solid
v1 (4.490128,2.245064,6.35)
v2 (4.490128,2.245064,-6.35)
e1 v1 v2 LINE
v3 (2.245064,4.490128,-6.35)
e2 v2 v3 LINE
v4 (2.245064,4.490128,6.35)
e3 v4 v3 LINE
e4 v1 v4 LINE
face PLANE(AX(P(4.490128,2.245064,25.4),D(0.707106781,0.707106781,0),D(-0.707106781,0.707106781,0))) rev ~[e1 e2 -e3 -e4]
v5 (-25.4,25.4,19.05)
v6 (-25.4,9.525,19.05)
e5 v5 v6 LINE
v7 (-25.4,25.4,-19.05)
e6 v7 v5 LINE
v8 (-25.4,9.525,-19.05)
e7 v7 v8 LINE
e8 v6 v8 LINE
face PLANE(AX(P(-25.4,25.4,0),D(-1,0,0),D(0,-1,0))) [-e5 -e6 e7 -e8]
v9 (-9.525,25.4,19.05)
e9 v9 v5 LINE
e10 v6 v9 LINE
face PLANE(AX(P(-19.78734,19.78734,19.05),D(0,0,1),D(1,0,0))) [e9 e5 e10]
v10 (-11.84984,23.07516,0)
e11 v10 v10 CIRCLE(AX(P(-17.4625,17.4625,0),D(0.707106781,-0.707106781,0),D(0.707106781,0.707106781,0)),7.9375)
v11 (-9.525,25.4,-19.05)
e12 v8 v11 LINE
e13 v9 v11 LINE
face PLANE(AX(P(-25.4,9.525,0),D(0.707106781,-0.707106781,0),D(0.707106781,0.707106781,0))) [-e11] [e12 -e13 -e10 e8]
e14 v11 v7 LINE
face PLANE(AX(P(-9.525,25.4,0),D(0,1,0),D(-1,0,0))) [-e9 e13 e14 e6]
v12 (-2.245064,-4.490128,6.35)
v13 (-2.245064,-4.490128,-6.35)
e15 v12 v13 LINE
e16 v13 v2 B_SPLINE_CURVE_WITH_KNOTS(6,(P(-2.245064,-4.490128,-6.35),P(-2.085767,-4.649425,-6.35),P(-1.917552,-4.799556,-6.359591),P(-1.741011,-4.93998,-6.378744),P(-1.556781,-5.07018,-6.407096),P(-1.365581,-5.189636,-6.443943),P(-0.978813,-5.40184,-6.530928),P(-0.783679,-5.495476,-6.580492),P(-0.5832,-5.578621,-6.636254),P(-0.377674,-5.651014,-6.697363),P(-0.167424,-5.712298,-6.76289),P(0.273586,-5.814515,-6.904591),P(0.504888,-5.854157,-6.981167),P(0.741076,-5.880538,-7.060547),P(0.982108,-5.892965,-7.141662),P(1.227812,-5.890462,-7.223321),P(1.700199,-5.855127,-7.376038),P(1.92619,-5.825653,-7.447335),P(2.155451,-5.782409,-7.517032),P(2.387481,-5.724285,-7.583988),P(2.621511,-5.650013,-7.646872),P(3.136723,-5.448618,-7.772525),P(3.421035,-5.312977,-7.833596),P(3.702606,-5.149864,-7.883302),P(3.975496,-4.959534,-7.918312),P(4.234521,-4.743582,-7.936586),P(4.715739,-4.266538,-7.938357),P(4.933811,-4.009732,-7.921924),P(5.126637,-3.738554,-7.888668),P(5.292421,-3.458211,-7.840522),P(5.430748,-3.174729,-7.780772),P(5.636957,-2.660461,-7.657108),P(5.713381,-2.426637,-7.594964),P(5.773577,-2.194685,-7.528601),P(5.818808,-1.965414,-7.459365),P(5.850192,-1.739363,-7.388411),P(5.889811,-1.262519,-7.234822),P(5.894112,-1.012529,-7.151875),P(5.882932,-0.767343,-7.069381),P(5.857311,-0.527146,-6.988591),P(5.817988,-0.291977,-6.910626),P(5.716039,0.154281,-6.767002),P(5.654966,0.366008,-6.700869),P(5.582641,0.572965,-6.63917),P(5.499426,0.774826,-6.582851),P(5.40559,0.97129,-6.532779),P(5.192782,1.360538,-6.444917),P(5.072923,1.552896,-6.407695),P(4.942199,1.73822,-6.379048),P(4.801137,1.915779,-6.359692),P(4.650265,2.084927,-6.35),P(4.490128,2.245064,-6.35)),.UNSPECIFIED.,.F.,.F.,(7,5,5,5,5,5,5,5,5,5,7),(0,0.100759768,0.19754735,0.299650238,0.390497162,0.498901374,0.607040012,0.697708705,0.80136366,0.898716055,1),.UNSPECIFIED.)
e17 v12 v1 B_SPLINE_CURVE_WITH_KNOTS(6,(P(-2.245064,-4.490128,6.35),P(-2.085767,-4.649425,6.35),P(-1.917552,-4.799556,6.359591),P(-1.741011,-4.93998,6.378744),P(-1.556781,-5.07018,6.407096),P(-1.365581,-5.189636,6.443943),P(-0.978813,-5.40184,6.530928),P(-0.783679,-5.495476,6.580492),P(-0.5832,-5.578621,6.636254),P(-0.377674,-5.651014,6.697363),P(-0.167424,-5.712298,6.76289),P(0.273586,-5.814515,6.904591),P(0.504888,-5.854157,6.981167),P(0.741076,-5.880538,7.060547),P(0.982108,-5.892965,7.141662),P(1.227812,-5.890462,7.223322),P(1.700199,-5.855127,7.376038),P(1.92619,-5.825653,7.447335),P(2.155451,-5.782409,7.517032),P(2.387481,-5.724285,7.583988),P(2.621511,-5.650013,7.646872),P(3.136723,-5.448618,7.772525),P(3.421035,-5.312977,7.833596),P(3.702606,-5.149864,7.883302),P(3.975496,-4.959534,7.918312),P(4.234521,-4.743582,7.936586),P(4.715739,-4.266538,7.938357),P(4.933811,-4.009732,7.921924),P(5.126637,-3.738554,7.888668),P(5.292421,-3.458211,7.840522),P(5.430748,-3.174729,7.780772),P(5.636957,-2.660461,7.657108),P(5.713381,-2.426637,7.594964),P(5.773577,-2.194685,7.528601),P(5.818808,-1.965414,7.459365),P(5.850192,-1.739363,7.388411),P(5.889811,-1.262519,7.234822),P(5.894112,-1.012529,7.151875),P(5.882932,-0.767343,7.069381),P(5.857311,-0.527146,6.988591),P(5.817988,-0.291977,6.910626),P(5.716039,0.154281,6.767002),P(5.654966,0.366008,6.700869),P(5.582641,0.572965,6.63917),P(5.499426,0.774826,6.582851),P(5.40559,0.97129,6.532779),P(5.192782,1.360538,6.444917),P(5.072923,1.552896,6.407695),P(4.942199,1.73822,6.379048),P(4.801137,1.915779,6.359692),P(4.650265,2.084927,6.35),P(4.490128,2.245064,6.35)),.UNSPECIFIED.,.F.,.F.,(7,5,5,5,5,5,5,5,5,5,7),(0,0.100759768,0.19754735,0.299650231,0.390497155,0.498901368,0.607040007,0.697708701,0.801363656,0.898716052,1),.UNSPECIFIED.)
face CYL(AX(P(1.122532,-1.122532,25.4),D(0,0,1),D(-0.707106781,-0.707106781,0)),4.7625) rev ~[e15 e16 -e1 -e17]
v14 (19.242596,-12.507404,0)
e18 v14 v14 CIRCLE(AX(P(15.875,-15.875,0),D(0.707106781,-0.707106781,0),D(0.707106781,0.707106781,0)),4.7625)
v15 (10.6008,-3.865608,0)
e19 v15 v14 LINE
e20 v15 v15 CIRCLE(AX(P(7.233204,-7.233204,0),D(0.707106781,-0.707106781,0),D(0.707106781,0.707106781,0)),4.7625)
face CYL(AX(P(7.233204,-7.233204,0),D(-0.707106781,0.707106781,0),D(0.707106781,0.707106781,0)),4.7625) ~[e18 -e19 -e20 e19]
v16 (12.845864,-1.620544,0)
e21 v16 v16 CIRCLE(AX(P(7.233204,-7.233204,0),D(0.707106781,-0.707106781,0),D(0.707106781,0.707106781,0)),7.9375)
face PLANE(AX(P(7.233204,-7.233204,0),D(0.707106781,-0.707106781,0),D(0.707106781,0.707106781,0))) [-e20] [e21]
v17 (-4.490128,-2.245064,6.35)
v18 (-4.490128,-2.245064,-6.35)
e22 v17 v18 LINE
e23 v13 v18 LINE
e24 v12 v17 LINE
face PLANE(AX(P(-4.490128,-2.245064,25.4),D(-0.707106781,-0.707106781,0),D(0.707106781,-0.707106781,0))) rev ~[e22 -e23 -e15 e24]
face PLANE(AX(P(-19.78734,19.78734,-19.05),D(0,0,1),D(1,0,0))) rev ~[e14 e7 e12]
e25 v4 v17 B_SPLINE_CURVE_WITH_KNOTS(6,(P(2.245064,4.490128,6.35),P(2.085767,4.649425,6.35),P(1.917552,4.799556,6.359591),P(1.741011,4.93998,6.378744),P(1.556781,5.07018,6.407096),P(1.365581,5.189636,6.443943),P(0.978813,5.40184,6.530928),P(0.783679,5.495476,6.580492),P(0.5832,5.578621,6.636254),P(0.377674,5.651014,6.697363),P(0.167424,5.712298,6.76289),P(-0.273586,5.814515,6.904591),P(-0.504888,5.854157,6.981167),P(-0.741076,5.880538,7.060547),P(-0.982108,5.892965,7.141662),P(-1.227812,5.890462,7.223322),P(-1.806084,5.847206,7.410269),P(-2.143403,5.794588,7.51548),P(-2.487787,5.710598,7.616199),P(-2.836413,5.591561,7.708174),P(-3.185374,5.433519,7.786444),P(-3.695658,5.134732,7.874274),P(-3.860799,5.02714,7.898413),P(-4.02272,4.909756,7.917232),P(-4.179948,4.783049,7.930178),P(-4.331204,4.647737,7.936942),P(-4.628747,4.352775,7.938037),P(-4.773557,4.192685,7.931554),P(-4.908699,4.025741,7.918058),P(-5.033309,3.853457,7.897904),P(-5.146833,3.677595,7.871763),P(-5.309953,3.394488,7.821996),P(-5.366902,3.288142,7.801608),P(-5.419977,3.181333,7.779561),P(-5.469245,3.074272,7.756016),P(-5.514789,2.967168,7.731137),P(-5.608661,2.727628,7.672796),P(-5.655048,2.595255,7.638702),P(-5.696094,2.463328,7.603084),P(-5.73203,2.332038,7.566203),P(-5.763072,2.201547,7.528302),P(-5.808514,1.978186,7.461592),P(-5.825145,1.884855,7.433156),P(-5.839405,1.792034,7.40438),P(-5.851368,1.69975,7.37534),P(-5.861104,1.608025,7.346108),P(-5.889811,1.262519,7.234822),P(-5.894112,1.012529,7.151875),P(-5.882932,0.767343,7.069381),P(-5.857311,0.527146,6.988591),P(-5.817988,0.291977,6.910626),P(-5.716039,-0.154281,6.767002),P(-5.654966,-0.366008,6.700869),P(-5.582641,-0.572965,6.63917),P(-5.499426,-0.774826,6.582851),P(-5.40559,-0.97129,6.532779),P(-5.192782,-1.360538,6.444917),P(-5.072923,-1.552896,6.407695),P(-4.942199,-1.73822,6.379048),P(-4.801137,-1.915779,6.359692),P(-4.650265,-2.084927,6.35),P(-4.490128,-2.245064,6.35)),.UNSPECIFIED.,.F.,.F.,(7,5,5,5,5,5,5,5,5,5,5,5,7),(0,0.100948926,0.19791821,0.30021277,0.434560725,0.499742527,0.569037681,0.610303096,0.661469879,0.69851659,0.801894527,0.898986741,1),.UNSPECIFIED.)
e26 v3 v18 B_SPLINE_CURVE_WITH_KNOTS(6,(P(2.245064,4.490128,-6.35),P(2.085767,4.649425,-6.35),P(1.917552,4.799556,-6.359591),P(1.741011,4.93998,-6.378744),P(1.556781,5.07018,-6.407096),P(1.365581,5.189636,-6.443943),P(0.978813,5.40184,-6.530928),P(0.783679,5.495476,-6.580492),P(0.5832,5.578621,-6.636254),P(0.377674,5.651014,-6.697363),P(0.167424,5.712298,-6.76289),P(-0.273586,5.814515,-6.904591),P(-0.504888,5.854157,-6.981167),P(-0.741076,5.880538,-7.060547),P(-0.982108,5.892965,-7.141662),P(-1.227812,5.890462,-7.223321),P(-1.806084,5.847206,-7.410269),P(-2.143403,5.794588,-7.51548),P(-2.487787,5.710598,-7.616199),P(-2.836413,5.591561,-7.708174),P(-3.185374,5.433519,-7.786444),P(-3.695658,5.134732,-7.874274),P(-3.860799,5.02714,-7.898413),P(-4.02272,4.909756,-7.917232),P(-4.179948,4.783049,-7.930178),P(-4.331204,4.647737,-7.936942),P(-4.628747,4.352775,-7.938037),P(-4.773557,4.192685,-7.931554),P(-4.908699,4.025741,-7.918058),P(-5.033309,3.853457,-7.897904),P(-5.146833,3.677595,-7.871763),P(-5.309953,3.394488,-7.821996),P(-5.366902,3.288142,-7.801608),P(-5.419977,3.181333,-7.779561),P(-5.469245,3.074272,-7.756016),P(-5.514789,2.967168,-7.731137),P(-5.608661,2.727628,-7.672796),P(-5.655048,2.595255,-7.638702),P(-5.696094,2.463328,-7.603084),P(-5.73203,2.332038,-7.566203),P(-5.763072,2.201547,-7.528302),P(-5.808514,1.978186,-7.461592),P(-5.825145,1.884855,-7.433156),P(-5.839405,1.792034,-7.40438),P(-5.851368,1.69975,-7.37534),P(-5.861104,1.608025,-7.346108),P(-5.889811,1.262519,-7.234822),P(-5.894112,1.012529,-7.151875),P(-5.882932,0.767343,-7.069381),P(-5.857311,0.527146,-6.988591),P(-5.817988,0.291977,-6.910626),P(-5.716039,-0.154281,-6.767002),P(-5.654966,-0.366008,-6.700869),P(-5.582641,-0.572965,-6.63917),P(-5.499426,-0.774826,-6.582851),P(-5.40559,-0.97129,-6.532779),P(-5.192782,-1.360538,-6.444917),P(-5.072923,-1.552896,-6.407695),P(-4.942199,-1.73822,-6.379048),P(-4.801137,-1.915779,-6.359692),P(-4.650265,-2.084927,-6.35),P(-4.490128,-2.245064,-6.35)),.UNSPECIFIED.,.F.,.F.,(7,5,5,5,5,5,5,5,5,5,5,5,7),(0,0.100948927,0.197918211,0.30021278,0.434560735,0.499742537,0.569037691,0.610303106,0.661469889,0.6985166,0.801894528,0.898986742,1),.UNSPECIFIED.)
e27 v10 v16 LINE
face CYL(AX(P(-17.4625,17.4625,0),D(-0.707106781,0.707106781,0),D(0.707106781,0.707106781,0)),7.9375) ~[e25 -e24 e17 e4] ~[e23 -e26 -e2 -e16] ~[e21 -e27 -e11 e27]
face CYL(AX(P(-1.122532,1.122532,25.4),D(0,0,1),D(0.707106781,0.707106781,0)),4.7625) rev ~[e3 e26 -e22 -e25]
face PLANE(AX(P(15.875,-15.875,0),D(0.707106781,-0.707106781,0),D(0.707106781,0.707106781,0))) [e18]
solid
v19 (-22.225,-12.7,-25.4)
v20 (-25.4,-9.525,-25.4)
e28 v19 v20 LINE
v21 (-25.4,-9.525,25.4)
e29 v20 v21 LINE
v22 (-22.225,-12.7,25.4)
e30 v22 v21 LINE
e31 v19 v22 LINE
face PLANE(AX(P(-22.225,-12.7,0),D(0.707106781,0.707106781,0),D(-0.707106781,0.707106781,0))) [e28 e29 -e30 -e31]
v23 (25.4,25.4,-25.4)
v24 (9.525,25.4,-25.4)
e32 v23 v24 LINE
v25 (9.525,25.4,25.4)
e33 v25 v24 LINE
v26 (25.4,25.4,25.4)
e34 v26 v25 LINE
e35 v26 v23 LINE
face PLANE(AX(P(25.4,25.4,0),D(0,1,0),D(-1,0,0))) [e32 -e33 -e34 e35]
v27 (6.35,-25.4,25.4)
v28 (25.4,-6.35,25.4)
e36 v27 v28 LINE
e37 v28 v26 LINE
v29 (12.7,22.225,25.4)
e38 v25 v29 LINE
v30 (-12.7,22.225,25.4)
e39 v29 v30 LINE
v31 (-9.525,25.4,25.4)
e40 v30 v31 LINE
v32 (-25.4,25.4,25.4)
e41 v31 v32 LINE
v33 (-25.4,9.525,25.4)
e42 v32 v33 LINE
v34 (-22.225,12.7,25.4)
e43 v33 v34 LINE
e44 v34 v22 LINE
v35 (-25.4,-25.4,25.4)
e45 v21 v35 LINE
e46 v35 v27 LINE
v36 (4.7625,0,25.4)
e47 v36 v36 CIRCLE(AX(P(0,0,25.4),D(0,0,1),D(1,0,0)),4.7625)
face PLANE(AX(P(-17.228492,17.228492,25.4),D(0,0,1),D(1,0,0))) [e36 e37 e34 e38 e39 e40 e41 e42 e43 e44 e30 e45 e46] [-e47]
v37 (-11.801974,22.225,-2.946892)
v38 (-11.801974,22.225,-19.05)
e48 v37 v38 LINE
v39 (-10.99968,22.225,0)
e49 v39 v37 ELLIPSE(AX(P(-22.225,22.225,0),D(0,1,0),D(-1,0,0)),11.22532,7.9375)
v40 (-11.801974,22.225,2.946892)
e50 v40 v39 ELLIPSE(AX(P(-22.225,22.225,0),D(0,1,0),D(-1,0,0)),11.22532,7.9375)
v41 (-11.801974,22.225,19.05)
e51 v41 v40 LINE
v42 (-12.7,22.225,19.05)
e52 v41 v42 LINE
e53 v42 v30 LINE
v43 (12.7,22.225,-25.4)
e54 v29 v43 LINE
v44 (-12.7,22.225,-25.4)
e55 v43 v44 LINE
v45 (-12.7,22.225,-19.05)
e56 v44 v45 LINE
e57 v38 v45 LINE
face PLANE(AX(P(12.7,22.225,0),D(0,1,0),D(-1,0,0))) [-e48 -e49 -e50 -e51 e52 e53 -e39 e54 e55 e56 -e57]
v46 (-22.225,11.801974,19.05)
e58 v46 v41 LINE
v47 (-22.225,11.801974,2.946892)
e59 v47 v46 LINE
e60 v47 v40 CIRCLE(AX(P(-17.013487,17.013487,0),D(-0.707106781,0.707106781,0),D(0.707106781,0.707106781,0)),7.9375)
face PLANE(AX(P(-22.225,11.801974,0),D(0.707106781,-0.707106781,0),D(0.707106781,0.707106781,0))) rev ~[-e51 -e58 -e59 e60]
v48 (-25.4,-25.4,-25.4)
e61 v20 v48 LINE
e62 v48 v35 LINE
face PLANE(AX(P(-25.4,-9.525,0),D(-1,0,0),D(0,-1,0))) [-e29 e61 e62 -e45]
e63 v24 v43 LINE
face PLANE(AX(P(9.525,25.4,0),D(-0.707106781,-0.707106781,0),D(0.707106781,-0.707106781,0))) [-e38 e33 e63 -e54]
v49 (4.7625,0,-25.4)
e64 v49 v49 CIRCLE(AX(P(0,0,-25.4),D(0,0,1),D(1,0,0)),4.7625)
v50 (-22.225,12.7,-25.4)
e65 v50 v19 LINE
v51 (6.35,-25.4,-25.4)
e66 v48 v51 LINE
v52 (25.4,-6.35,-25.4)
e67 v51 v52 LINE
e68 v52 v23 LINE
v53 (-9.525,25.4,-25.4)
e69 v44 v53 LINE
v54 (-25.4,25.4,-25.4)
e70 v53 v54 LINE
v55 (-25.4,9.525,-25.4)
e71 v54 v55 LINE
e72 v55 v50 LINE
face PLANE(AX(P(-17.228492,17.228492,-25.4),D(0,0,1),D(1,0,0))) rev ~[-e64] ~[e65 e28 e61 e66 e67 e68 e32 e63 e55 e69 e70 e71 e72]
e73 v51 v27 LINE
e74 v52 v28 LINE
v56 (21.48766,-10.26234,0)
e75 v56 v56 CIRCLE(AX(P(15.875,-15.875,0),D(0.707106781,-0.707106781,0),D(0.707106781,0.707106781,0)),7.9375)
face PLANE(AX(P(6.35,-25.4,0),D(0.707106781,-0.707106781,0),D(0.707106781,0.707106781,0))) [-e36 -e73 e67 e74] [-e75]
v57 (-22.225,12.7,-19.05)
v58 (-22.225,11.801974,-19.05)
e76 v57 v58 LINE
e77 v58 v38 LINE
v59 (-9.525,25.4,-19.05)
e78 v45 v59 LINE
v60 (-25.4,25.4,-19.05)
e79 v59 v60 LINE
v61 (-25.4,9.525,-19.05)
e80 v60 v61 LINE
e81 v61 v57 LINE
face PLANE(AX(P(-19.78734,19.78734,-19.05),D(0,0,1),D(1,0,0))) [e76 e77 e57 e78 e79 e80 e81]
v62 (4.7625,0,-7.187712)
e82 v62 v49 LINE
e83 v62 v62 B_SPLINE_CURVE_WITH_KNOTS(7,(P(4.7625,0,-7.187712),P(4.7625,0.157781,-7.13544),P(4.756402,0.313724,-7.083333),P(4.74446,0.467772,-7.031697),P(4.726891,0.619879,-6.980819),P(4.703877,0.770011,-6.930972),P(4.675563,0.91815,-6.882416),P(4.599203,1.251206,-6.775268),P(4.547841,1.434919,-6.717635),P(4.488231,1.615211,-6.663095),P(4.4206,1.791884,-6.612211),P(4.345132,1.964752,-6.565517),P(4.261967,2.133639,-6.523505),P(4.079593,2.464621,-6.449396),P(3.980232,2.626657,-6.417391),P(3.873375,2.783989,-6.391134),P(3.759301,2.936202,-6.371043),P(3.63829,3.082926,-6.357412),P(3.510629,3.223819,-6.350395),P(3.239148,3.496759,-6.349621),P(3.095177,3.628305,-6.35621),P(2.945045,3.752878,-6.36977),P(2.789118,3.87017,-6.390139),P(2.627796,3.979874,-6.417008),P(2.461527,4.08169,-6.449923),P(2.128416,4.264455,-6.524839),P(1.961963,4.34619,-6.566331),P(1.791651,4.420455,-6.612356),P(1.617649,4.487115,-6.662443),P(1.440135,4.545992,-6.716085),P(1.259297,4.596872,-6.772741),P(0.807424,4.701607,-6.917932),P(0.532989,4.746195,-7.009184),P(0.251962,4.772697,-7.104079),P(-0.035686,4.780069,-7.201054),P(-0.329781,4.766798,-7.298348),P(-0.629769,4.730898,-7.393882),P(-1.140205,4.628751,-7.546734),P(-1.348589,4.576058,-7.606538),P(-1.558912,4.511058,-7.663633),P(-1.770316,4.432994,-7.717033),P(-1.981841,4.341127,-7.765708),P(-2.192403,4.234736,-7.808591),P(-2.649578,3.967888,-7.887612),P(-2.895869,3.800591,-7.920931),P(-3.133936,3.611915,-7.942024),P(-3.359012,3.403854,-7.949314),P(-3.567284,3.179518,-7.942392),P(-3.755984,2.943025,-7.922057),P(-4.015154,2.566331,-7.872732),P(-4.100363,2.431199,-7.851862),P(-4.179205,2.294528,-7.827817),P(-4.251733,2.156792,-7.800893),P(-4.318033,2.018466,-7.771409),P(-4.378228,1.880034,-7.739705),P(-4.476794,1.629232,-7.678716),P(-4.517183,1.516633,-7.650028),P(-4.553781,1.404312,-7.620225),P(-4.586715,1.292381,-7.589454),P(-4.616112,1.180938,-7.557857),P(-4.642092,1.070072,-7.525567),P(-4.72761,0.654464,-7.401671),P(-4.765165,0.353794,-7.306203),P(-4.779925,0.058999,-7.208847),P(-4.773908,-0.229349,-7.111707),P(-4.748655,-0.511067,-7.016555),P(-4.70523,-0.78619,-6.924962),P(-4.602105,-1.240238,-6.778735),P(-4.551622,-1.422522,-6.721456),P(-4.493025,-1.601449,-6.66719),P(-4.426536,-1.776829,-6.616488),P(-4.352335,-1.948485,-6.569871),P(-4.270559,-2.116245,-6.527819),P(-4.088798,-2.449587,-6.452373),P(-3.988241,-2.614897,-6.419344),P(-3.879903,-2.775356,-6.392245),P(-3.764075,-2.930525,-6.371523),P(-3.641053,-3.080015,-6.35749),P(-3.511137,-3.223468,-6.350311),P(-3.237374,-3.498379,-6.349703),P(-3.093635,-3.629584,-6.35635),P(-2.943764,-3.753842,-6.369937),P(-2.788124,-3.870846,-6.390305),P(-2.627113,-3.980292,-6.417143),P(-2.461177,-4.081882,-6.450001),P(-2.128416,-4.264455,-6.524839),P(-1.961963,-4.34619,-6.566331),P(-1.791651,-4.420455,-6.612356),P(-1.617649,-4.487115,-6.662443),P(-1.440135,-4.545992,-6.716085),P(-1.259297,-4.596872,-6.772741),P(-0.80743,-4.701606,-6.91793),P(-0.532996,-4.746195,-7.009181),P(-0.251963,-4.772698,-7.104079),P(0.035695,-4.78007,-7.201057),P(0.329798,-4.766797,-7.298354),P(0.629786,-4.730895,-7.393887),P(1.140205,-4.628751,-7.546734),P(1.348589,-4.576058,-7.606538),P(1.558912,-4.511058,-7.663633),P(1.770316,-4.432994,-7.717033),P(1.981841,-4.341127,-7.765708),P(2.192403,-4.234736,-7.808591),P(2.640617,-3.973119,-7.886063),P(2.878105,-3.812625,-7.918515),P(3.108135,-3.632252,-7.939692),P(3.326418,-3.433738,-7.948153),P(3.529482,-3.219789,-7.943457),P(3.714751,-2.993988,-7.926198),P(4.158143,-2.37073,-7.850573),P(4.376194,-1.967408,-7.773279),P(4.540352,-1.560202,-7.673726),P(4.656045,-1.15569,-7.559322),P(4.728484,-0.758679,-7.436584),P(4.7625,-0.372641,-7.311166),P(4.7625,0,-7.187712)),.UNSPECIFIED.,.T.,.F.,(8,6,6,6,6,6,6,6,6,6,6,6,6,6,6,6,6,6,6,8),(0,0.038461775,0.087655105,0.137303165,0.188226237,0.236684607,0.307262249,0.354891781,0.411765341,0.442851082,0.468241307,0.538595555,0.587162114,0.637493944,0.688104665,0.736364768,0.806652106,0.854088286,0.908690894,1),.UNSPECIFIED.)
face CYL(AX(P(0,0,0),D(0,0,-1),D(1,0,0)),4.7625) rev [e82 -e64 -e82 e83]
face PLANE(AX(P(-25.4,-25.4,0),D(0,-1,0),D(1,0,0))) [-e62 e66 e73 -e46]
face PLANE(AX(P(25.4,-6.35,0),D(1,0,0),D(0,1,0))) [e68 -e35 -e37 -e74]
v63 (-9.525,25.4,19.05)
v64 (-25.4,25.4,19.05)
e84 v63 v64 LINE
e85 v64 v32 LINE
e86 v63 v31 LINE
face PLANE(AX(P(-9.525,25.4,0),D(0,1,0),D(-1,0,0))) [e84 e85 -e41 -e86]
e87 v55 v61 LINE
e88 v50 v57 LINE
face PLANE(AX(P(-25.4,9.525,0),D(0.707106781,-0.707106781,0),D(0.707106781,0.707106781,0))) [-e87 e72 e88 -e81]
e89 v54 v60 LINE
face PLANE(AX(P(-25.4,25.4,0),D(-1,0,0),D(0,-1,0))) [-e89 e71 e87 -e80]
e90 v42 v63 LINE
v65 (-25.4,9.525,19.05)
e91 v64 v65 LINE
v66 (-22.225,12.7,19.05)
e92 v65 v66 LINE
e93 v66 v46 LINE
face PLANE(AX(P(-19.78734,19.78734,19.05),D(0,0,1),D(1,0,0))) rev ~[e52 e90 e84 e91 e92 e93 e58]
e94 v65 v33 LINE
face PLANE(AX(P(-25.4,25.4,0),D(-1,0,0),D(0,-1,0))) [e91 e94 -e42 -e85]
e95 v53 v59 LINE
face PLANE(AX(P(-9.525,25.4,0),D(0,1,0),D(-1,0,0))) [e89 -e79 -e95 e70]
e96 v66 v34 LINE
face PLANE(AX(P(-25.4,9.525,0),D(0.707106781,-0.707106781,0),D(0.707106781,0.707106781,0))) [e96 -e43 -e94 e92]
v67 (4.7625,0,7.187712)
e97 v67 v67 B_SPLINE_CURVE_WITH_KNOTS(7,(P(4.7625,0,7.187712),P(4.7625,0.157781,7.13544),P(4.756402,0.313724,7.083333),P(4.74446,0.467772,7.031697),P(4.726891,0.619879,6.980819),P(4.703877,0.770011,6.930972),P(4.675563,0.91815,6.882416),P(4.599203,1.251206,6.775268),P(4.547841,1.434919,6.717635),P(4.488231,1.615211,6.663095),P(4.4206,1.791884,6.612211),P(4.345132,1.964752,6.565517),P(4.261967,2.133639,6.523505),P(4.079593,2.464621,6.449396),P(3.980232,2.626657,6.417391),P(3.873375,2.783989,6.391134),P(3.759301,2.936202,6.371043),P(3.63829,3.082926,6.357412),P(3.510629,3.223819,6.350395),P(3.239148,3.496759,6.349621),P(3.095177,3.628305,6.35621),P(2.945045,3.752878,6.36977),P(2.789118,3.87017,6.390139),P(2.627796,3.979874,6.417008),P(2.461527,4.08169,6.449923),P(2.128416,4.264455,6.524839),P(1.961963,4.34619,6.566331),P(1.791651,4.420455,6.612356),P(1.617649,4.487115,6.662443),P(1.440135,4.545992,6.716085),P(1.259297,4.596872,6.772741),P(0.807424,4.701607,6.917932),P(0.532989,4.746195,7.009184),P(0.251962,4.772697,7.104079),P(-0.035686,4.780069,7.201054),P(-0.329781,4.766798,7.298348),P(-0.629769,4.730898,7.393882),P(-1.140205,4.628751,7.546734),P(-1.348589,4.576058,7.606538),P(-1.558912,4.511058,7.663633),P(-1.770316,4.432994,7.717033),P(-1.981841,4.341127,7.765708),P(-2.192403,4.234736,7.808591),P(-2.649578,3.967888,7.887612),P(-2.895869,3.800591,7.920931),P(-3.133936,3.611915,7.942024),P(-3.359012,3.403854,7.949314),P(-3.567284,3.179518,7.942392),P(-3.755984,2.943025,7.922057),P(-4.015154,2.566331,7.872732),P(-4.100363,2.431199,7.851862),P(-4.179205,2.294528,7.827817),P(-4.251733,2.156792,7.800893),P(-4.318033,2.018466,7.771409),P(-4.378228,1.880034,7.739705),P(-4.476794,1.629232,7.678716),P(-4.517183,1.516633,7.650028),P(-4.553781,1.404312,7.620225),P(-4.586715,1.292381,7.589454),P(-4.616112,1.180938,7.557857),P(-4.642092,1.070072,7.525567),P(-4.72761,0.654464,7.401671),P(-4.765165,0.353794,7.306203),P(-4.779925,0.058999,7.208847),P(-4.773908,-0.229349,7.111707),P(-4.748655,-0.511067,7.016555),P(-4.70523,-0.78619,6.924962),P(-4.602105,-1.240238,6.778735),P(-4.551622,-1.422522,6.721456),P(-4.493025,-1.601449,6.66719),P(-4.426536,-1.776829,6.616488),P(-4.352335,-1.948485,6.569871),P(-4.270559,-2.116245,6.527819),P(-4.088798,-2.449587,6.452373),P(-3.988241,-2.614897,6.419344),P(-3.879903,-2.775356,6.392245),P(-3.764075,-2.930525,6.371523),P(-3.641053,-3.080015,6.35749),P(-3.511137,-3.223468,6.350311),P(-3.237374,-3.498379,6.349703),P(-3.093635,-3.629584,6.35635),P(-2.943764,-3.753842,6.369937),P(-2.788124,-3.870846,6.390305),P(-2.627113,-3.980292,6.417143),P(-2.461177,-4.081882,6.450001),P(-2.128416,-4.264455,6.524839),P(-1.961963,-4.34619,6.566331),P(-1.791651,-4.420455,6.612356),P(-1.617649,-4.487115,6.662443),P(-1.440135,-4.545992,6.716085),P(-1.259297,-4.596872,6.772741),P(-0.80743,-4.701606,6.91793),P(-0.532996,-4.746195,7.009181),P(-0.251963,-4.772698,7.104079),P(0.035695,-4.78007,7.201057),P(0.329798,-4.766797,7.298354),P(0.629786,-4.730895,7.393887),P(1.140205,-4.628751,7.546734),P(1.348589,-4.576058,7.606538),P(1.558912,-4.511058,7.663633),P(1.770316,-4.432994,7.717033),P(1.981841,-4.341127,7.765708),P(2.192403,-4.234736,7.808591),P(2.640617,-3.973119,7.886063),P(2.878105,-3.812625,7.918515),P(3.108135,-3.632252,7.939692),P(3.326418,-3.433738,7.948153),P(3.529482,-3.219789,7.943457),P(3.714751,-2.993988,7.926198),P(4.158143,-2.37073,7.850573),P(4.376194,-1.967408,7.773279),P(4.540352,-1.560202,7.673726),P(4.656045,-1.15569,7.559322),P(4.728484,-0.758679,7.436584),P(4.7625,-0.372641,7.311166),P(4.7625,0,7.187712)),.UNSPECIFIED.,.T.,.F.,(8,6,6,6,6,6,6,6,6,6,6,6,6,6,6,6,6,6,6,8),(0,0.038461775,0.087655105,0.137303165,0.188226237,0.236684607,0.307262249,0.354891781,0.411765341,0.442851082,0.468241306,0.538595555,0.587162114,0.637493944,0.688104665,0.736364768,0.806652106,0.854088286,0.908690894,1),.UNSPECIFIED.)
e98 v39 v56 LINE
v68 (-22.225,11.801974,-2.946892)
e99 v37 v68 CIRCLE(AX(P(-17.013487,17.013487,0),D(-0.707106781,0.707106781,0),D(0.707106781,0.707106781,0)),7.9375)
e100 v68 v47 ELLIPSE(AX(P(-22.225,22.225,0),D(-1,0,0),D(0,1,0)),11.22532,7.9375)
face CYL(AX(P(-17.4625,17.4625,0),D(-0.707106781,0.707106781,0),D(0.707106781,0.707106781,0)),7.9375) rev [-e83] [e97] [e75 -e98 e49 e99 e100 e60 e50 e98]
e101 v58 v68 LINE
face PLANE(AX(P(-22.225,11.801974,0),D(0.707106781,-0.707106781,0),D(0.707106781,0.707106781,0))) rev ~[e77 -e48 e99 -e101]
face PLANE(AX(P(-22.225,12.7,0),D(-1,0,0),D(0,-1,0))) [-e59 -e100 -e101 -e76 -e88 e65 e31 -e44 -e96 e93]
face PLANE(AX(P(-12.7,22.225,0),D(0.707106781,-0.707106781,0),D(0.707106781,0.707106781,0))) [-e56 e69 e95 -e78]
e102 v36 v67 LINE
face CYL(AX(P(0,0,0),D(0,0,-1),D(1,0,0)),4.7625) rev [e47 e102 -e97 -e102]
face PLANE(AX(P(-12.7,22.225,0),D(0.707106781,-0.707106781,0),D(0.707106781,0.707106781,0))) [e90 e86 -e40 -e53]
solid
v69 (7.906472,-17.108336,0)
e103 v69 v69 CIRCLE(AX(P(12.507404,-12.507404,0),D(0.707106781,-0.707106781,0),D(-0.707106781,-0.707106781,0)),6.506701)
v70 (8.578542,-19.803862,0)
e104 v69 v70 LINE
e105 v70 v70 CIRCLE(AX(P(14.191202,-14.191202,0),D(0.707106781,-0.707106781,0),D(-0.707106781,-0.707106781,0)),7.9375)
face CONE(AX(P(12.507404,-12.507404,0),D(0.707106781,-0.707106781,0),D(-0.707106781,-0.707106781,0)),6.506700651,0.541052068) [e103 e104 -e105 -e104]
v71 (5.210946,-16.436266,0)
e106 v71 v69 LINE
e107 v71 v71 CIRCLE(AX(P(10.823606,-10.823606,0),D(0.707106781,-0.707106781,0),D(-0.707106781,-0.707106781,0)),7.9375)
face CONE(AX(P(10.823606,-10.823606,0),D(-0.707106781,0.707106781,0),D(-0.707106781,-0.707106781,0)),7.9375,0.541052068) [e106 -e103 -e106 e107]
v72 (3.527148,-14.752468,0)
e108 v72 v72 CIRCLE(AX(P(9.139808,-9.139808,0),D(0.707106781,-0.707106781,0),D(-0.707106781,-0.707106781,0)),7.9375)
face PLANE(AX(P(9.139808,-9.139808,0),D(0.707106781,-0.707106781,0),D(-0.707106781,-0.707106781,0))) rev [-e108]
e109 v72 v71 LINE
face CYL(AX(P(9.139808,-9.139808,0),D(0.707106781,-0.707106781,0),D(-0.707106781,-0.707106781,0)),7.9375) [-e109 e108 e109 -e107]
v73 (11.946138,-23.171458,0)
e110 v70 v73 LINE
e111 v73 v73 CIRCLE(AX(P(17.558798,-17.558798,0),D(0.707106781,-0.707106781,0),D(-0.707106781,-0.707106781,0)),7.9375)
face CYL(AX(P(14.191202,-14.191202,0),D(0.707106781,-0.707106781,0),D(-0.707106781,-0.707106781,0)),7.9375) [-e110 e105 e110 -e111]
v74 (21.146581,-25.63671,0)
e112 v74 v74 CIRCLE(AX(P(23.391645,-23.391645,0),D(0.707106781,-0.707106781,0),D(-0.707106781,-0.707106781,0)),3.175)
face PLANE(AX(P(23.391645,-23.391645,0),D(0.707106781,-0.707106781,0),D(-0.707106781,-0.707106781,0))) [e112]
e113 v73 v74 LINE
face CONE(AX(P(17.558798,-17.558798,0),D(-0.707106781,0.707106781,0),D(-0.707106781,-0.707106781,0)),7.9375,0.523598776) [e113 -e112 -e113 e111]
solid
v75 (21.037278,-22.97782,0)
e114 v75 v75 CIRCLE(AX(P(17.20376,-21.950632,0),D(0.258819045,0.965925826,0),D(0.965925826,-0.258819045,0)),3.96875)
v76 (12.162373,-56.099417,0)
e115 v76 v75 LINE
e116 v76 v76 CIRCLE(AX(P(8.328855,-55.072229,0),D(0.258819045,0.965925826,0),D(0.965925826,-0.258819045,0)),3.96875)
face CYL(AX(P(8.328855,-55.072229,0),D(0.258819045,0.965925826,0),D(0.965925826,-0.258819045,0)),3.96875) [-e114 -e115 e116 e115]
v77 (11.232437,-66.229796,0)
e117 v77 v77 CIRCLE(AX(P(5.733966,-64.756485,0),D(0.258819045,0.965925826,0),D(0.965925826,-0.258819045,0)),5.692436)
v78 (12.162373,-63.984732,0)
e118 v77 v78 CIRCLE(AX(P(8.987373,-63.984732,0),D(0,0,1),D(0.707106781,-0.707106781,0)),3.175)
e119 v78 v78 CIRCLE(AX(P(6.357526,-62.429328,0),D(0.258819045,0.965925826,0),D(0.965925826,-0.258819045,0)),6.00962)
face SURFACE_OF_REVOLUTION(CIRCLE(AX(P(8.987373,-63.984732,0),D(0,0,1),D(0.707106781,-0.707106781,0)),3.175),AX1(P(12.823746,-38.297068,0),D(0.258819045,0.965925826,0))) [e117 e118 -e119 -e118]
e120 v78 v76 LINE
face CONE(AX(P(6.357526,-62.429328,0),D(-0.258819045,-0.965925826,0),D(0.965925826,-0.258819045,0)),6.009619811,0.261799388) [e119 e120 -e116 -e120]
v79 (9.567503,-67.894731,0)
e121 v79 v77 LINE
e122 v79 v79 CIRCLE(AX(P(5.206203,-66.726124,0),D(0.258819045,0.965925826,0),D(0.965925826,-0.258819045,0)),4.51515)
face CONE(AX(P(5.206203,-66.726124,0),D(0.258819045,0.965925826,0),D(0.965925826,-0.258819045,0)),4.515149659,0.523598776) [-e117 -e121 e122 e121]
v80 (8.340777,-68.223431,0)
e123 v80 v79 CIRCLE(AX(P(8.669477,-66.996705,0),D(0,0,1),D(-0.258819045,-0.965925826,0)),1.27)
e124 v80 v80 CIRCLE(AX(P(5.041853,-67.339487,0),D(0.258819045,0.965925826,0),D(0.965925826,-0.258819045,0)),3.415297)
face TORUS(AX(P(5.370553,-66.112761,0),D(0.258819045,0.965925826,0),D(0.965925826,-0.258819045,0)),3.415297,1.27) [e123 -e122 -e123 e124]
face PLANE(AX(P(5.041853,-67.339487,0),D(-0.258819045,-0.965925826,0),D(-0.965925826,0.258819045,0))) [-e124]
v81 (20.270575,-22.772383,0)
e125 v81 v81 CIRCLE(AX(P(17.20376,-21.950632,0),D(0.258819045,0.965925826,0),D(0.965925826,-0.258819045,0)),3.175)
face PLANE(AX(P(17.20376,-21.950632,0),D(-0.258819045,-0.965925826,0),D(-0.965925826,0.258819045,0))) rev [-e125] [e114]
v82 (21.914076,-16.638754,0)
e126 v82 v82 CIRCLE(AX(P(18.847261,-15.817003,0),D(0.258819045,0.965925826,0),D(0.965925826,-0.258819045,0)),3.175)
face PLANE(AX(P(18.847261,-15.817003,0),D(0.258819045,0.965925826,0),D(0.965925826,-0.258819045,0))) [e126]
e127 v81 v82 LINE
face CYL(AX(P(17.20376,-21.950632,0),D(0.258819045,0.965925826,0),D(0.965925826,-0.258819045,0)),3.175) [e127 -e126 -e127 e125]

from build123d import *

# Parameters (mm, degrees)
F1_R      = 4.7625
F2_DEPTH  = 25.4
F3_DEPTH  = 19.05
F4_DEPTH  = 19.05
F5_R      = 7.9375
F6_DEPTH  = 47.1463446356
F7_DEPTH  = 34.925
F8_R      = 4.7625
F9_DEPTH  = 12.2213446356
F11_DEPTH = 50.8010001


with BuildPart() as f2:
    # F1 (on Top) → F2 (new body, symmetric)
    with BuildSketch(Plane.XY):
        Polygon((-11.8019743879, 22.225), (-12.7, 22.225), (-22.225, 12.7), (-22.225, 11.8019743879), align=None)
        Polygon((25.4, -6.35), (25.4, 25.4), (9.525, 25.4), (12.7, 22.225), (-11.8019743879, 22.225), (-22.225, 11.8019743879), (-22.225, -12.7), (-25.4, -9.525), (-25.4, -25.4), (6.35, -25.4), align=None)
        Circle(F1_R, mode=Mode.SUBTRACT)
        Polygon((-12.7, 22.225), (-9.525, 25.4), (-25.4, 25.4), (-25.4, 9.525), (-22.225, 12.7), align=None)
    extrude(amount=F2_DEPTH, both=True)

    # F1 (on Top) → F3 (cut, symmetric)
    with BuildSketch(Plane.XY):
        Polygon((-12.7, 22.225), (-9.525, 25.4), (-25.4, 25.4), (-25.4, 9.525), (-22.225, 12.7), align=None)
        Polygon((-11.8019743879, 22.225), (-12.7, 22.225), (-22.225, 12.7), (-22.225, 11.8019743879), align=None)
    extrude(amount=F3_DEPTH, both=True, mode=Mode.SUBTRACT)

    # F5 (on face) → F6 (cut, through all)
    with BuildSketch(Plane(origin=(-17.4625, 17.4625, 0), x_dir=(0.7071067812, 0.7071067812, 0), z_dir=(0.7071067812, -0.7071067812, 0))):
        Circle(F5_R)
    extrude(amount=F6_DEPTH, mode=Mode.SUBTRACT)


with BuildPart() as f4:
    # F1 (on Top) → F4 (new body, symmetric)
    with BuildSketch(Plane.XY):
        Polygon((-12.7, 22.225), (-9.525, 25.4), (-25.4, 25.4), (-25.4, 9.525), (-22.225, 12.7), align=None)
    extrude(amount=F4_DEPTH, both=True)

    # F5 (on face) → F7 (join)
    with BuildSketch(Plane(origin=(-17.4625, 17.4625, 0), x_dir=(0.7071067812, 0.7071067812, 0), z_dir=(0.7071067812, -0.7071067812, 0))):
        Circle(F5_R)
    extrude(amount=F7_DEPTH)

    # F8 (on face) → F9 (join, through all)
    with BuildSketch(Plane(origin=(7.2332043329, -7.2332043329, 0), x_dir=(0.7071067812, 0.7071067812, 0), z_dir=(0.7071067812, -0.7071067812, 0))):
        Circle(F8_R)
    extrude(amount=F9_DEPTH)

    # F10 (on face) → F11 (cut, through all)
    with BuildSketch(Plane.XY.offset(25.4)):
        with BuildLine():
            Line((4.4901280605, 2.2450640303), (2.2450640303, 4.4901280605))
            ThreePointArc((2.2450640303, 4.4901280605), (-4.4901280605, 4.4901280605), (-4.4901280605, -2.2450640303))
            Line((-4.4901280605, -2.2450640303), (-2.2450640303, -4.4901280605))
            ThreePointArc((-2.2450640303, -4.4901280605), (4.4901280605, -4.4901280605), (4.4901280605, 2.2450640303))
        make_face()
    extrude(amount=-F11_DEPTH, mode=Mode.SUBTRACT)


with BuildPart() as f13:
    # F12 (on Top) → F13 (revolve)
    with BuildSketch(Plane.XY):
        Polygon((23.3916454727, -23.3916454727), (9.1398079092, -9.1398079092), (3.5271478335, -14.7524679849), (5.2109458562, -16.4362660076), (6.2226737785, -15.4245380853), (7.9064718012, -17.108336108), (9.5902698239, -18.7921341307), (8.5785419016, -19.803862053), (11.946137947, -23.1714580984), (21.1465814424, -25.636709503), align=None)
        Polygon((6.2226737785, -15.4245380853), (5.2109458562, -16.4362660076), (7.9064718012, -17.108336108), align=None)
        Polygon((9.5902698239, -18.7921341307), (7.9064718012, -17.108336108), (8.5785419016, -19.803862053), align=None)
    revolve(axis=Axis((0, 0, 0), (0.7071067812, -0.7071067812, 0)))


with BuildPart() as f15:
    # F14 (on Top) → F15 (revolve)
    with BuildSketch(Plane.XY):
        with BuildLine():
            Line((21.9140755042, -16.6387536732), (18.8472610057, -15.817003205))
            Line((18.8472610057, -15.817003205), (5.0418531399, -67.3394867792))
            Line((5.0418531399, -67.3394867792), (8.3407770996, -68.2234307901))
            ThreePointArc((8.3407770996, -68.2234307901), (8.9981774742, -68.2234307901), (9.567502899, -67.8947306028))
            Line((9.567502899, -67.8947306028), (11.2324371661, -66.2297963357))
            ThreePointArc((11.2324371661, -66.2297963357), (11.9206906515, -65.1997522032), (12.1623731358, -63.9847323055))
            Line((12.1623731358, -63.9847323055), (12.1623731358, -56.0994168706))
            Line((12.1623731358, -56.0994168706), (21.0372781924, -22.9778202871))
            Line((21.0372781924, -22.9778202871), (20.2705745678, -22.7723826701))
            Line((20.2705745678, -22.7723826701), (21.9140755042, -16.6387536732))
        make_face()
    revolve(axis=Axis((12.8237458576, -38.2970677779, 0), (0.2588190451, 0.9659258263, 0)))


solid = Compound([f2.part, f4.part, f13.part, f15.part])
